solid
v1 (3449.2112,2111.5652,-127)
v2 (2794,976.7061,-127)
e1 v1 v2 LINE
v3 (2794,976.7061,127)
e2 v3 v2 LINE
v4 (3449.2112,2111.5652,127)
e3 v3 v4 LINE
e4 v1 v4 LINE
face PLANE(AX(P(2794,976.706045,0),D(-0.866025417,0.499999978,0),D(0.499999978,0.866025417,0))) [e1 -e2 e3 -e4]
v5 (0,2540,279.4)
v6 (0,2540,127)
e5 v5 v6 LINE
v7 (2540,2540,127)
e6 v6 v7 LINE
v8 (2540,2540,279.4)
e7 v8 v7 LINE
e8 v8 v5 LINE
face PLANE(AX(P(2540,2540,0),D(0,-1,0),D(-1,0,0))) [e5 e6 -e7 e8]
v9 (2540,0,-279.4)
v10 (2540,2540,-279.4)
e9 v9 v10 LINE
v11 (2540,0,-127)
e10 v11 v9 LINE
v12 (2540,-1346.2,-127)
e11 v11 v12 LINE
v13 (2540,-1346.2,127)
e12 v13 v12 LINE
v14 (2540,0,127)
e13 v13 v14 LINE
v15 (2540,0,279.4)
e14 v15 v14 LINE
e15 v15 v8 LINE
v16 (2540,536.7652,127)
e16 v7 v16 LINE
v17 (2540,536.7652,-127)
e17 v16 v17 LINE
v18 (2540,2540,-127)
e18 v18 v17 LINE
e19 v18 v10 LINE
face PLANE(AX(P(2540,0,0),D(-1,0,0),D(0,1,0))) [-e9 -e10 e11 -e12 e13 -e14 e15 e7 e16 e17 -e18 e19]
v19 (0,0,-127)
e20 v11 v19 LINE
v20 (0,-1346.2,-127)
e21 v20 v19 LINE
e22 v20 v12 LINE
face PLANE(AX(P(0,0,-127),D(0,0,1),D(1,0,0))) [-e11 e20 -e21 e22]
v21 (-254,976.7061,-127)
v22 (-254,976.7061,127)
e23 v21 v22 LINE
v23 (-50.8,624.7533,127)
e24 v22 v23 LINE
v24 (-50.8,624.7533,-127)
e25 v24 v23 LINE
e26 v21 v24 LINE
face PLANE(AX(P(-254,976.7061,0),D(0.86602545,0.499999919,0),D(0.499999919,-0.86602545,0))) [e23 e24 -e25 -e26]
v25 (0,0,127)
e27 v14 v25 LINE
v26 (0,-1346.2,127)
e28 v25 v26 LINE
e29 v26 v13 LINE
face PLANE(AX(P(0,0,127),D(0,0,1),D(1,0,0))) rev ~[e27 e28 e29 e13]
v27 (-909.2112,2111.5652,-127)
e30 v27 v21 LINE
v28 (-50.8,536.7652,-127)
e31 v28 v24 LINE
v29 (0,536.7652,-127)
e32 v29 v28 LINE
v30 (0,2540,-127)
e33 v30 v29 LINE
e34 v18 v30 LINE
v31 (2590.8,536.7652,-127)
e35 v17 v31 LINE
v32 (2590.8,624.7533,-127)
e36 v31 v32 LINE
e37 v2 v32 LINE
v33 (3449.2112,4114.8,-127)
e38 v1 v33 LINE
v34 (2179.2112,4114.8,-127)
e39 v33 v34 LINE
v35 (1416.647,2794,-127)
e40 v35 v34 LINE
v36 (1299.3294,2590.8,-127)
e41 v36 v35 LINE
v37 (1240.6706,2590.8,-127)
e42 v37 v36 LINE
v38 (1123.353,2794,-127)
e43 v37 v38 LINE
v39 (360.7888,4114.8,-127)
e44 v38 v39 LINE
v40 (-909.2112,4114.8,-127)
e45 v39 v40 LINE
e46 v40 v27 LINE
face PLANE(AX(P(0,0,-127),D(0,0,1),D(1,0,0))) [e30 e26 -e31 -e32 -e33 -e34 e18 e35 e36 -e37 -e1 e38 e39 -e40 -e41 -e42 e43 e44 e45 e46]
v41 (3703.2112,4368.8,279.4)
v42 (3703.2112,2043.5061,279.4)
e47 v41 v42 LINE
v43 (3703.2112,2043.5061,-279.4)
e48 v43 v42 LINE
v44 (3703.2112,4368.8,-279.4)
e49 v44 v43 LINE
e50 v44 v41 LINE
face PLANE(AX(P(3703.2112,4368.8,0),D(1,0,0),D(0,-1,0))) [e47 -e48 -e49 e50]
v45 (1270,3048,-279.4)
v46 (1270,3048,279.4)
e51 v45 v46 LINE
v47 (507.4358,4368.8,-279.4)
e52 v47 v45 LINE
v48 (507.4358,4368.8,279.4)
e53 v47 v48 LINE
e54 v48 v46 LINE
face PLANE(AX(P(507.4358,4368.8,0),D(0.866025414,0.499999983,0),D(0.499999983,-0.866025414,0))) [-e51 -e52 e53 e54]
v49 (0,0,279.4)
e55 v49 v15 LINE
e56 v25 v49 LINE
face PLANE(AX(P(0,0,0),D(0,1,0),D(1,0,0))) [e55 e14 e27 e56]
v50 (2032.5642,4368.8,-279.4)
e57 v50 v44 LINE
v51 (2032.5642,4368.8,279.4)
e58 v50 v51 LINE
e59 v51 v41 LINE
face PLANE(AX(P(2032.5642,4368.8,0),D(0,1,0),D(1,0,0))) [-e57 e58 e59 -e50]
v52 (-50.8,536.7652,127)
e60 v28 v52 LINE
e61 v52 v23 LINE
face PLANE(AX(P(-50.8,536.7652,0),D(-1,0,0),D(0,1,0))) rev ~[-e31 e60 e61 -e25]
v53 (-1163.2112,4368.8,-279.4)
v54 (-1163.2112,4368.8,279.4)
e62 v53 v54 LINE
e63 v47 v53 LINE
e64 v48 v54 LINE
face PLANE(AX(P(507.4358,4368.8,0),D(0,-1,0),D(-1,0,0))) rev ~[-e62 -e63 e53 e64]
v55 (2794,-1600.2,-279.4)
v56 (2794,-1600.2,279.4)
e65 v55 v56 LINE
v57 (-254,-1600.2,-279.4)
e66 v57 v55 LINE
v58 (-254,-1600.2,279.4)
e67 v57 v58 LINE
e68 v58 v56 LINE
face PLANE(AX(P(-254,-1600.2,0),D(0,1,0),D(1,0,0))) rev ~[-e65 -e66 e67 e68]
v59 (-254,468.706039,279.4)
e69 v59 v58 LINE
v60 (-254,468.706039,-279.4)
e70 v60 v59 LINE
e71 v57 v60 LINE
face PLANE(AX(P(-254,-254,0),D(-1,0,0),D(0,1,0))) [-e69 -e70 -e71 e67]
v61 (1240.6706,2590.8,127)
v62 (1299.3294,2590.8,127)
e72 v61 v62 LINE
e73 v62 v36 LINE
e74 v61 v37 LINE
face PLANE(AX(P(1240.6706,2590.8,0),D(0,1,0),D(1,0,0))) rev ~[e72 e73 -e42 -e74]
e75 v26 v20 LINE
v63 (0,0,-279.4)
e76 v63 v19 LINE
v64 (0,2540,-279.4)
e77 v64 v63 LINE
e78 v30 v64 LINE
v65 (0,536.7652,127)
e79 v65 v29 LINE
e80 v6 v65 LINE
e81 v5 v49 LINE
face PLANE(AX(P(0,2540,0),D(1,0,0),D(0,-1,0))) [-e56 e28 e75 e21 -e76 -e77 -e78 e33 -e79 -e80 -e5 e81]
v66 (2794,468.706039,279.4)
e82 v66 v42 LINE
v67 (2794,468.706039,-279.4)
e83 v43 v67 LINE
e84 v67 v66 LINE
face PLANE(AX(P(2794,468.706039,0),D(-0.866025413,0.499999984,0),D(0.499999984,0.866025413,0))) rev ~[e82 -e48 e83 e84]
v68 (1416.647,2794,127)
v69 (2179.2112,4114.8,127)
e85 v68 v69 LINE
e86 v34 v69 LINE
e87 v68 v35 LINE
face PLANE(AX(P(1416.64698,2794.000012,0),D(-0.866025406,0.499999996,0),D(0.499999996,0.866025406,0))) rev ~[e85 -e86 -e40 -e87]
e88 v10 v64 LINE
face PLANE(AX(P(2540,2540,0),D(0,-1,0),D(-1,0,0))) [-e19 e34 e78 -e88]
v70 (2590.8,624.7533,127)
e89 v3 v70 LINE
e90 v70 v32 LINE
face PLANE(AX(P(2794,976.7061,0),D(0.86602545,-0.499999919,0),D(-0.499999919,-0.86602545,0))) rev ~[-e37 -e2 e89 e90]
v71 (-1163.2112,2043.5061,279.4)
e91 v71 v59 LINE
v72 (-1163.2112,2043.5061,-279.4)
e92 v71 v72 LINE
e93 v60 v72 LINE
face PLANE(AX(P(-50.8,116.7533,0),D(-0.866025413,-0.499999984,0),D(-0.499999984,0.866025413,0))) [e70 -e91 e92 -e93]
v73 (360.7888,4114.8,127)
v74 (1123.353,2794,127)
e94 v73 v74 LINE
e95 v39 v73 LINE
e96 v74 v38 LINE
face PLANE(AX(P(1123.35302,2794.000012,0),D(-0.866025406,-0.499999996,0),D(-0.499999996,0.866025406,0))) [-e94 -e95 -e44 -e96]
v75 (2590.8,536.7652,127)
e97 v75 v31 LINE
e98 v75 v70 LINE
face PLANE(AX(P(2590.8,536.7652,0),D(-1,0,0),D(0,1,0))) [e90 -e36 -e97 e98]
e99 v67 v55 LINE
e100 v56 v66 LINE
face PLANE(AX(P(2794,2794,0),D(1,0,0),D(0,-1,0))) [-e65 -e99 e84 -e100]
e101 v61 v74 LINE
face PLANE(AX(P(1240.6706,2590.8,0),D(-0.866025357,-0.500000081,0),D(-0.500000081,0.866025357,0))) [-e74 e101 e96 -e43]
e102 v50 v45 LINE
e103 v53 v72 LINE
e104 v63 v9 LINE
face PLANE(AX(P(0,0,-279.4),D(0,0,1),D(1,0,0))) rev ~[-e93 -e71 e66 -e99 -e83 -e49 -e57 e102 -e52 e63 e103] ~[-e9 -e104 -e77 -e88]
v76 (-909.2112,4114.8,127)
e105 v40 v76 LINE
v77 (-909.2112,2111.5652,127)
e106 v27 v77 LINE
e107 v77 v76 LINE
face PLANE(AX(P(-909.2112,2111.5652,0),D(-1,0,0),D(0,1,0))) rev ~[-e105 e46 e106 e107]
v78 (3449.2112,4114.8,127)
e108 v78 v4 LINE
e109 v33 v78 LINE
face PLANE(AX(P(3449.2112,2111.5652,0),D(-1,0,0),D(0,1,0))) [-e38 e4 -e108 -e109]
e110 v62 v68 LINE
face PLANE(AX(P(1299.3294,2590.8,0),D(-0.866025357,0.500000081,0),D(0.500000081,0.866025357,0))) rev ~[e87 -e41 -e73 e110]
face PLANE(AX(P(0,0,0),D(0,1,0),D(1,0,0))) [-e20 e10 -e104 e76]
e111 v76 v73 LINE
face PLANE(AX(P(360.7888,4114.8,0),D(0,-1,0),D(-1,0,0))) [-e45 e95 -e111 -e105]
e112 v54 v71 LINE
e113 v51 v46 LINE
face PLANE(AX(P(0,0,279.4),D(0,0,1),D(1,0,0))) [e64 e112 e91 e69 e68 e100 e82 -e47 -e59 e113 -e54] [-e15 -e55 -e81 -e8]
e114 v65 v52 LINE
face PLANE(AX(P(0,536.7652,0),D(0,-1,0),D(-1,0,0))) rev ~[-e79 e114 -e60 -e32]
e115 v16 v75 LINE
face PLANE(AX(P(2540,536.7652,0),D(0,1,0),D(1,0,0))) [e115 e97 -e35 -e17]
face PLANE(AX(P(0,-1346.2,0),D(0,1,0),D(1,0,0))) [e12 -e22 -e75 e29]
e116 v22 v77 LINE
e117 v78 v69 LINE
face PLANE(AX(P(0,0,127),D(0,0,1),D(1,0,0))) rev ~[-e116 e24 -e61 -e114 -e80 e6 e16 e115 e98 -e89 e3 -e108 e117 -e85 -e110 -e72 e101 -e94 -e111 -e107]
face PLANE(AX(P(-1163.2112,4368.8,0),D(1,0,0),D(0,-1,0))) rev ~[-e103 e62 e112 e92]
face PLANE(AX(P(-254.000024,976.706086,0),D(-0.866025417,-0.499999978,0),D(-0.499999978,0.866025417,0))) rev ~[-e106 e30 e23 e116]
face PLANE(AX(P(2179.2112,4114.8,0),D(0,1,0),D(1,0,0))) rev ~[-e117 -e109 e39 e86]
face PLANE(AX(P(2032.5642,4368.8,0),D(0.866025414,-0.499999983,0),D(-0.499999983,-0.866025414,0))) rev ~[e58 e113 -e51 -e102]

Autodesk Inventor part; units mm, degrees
ref_plane "YZ Plane" through (0, 0, 0) normal (1, 0, 0) x (0, 1, 0)
ref_plane "XZ Plane" through (0, 0, 0) normal (0, 1, 0) x (-1, 0, 0)
sketch "Sketch1" plane through (0, 0, 0) normal (0, 0, 1) x (1, 0, 0)
  line L0 (0, 0) -> (2540, 0)
  line L1 (2540, 0) -> (2540, 2540)
  line L2 (2540, 2540) -> (0, 2540)
  line L3 (0, 2540) -> (0, 0)
  line L4 (-254, 2794) -> (2794, 2794)
  line L5 (2794, 2794) -> (2794, -254)
  line L6 (2794, -254) -> (-254, -254)
  line L7 (-254, -254) -> (-254, 2794)
  line L8 (1270, 0) -> (1270, 1270) construction
  dimension "d0" = 2540
  dimension "d1" = 2540
  dimension "d3" = 254
  dimension "d4" = 254
  dimension "d5" = 254
  dimension "d6" = 254
  dimension "d932" = 1270
extrude "frame" add sketch "Sketch1" along normal mid plane 558.8
ref_plane "middle of part" through (0, 0, 0) normal (0, 0, 1) x (1, 0, 0)
sketch "Sketch8" plane through (0, 0, 0) normal (0, 0, 1) x (1, 0, 0)
  line L0 (2540, 0) -> (0, 0) projected
  line L1 (0, 0) -> (0, -254)
  line L2 (-254, -254) -> (2794, -254) projected
  line L3 (0, -254) -> (2540, -254)
  line L4 (2540, 2540) -> (2540, 0) projected
  line L5 (2540, -254) -> (2540, 0)
  line L6 (2540, 0) -> (0, 0)
extrude "door slot bottom" cut sketch "Sketch8" along normal mid plane 254
sketch "Sketch7" plane through (0, 0, 0) normal (0, 0, 1) x (1, 0, 0)
  line L0 (102.3298, 595.8453) -> (-251.9439, 1209.4654) construction
  line L1 (-254, -254) -> (-254, 2794) projected
  line L2 (1123.353, 2794) -> (-254, 2794)
  line L3 (-254, 2794) -> (-254, 976.7061)
  line L4 (-254, 976.7061) -> (-50.8, 624.7533)
  line L5 (0, 2540) -> (0, 0) projected
  line L6 (0, 536.7652) -> (0, 2540)
  line L7 (0, 2540) -> (1270, 2540)
  line L8 (1270, 1270) -> (1270, 1044.9425)
  line L9 (1270, 1270) -> (0, 536.7652)
  line L10 (1270, 1620.4707) -> (1270, 1965.6323) construction
  line L11 (1240.6706, 2590.8) -> (1123.353, 2794)
  line L12 (0, 536.7652) -> (-50.8, 536.7652)
  line L13 (-50.8, 536.7652) -> (-50.8, 624.7533)
  line L14 (2437.6702, 595.8453) -> (2791.9439, 1209.4654) construction
  line L15 (2794, -254) -> (2794, 2794)
  line L16 (1416.647, 2794) -> (2794, 2794)
  line L17 (2794, 2794) -> (2794, 976.7061)
  line L18 (2794, 976.7061) -> (2590.8, 624.7533)
  line L19 (2540, 2540) -> (2540, 0)
  line L20 (2540, 536.7652) -> (2540, 2540)
  line L21 (2540, 2540) -> (1270, 2540)
  line L22 (1270, 1270) -> (2540, 536.7652)
  line L23 (1299.3294, 2590.8) -> (1416.647, 2794)
  line L24 (2540, 536.7652) -> (2590.8, 536.7652)
  line L25 (2590.8, 536.7652) -> (2590.8, 624.7533)
  line L26 (1240.6706, 2590.8) -> (1299.3294, 2590.8)
  dimension "d878" = 60
  dimension "d889" = 50.8
  dimension "d901" = 50.8
extrude "top left and right slots" cut sketch "Sketch7" along normal mid plane 254 contours L1 L2 L11 L26 L23 L16 L15 L18 L25 L24 L19 L21 L7 L5 L12 L13 L4
sketch "Sketch13" plane through (0, 0, 0) normal (0, 0, 1) x (1, 0, 0)
  line L0 (0, -254) -> (0, 0) projected
  line L1 (0, -50.8) -> (0, -1346.2)
  line L2 (0, -1346.2) -> (2540, -1346.2)
  line L3 (2540, 0) -> (2540, -254) projected
  line L4 (2540, -1346.2) -> (2540, -50.8)
  line L5 (2794, -254) -> (-254, -254) projected
  line L6 (2540, -50.8) -> (0, -50.8) projected
  line L7 (2540, -50.8) -> (0, -50.8)
  line L8 (-50.8, 624.7533) -> (-254, 976.7061) projected
  line L9 (1240.6706, 2590.8) -> (1299.3294, 2590.8) projected
  line L10 (507.4358, 4368.8) -> (-1163.2112, 4368.8)
  line L11 (-1163.2112, 4368.8) -> (-1163.2112, 2043.5061)
  line L12 (1270, 3756.6434) -> (1270, 722.7588) construction
  line L13 (2540, 2590.8) -> (1299.3294, 2590.8)
  line L14 (1123.353, 2794) -> (1240.6706, 2590.8) projected
  line L15 (-50.8, 116.7533) -> (-1163.2112, 2043.5061)
  line L16 (-50.8, 624.7533) -> (-909.2112, 2111.5652)
  line L17 (-909.2112, 2111.5652) -> (-909.2112, 4114.8)
  line L18 (-50.8, 536.7652) -> (-50.8, 2540) projected
  line L19 (360.7888, 4114.8) -> (-909.2112, 4114.8)
  line L20 (1240.6706, 2590.8) -> (360.7888, 4114.8)
  line L21 (507.4358, 4368.8) -> (1270, 3048)
  line L22 (0, -50.8) -> (-254, -50.8)
  line L23 (-254, -254) -> (-254, 2794) projected
  line L24 (-254, -50.8) -> (-254, -1600.2)
  line L25 (-254, -1600.2) -> (2794, -1600.2)
  line L26 (2794, -1600.2) -> (2794, -50.8)
  line L27 (2794, 2794) -> (2794, -254) projected
  line L28 (2540, -50.8) -> (2794, -50.8)
  line L29 (1240.6706, 2590.8) -> (1270, 2590.8)
  line L30 (0, 2590.8) -> (2540, 2590.8) projected
  line L31 (1270, 2590.8) -> (1270, 3048)
  line L32 (-50.8, 536.7652) -> (-50.8, 624.7533) projected
  line L33 (-50.8, 624.7533) -> (-50.8, 116.7533)
  line L34 (2032.5642, 4368.8) -> (3703.2112, 4368.8)
  line L35 (3703.2112, 4368.8) -> (3703.2112, 2043.5061)
  line L36 (1416.647, 2794) -> (1299.3294, 2590.8)
  line L37 (2590.8, 116.7533) -> (3703.2112, 2043.5061)
  line L38 (2590.8, 624.7533) -> (3449.2112, 2111.5652)
  line L39 (3449.2112, 2111.5652) -> (3449.2112, 4114.8)
  line L40 (2179.2112, 4114.8) -> (3449.2112, 4114.8)
  line L41 (1299.3294, 2590.8) -> (2179.2112, 4114.8)
  line L42 (2032.5642, 4368.8) -> (1270, 3048)
  line L43 (1299.3294, 2590.8) -> (1270, 2590.8)
  line L44 (2590.8, 624.7533) -> (2590.8, 116.7533)
  line L45 (2794, 2794) -> (-254, 2794) projected
  dimension "d878" = 60
  dimension "d889" = 50.8
  dimension "d901" = 50.8
  dimension "d903" = 1295.4
  dimension "d907" = 254
  dimension "d916" = 254
  dimension "d917" = 254
  dimension "d919" = 254
  dimension "d920" = 254
  dimension "d921" = 254
  dimension "d926" = 655.2112
  dimension "d927" = 1320.8
extrude "door recieves" add sketch "Sketch13" along normal mid plane 558.8 contours L1 L2 L4 L5 L26 L25 L24 | L3 L28 L26 L5 | L23 L8 L18 L33 L15 | L15 L11 L10 L21 L31 L45 L20 L19 L17 L16 L23 | L37 L44 L38 L27 | L27 L38 L39 L40 L41 L45 L31 L42 L34 L35 L37 | L45 L31 L9 L14 | L36 L9 L31 L45
sketch "Sketch14" plane through (0, 0, 279.4) normal (0, 0, 1) x (1, 0, 0)
  line L0 (-254, 976.7061) -> (-909.2112, 2111.5652) projected
  line L1 (-909.2112, 2111.5652) -> (-909.2112, 4114.8) projected
  line L2 (-254, 976.7061) -> (-909.2112, 2111.5652)
  line L3 (-909.2112, 2111.5652) -> (-909.2112, 4114.8)
  line L4 (-909.2112, 4114.8) -> (360.7888, 4114.8)
  line L5 (-254, 2794) -> (1123.353, 2794) projected
  line L6 (360.7888, 4114.8) -> (1123.353, 2794)
  line L7 (1123.353, 2794) -> (-254, 2794)
  line L8 (-254, 2794) -> (-254, 976.7061)
  line L9 (3449.2112, 4114.8) -> (2179.2112, 4114.8) projected
  line L10 (1416.647, 2794) -> (2179.2112, 4114.8)
  line L11 (2179.2112, 4114.8) -> (3449.2112, 4114.8)
  line L12 (2794, 976.7061) -> (3449.2112, 2111.5652) projected
  line L13 (3449.2112, 4114.8) -> (3449.2112, 2111.5652)
  line L14 (2794, 2794) -> (2794, 976.7061) projected
  line L15 (3449.2112, 2111.5652) -> (2794, 976.7061)
  line L16 (2794, 976.7061) -> (2794, 2794)
  line L17 (2794, 2794) -> (1416.647, 2794)
  line L18 (2540, -254) -> (0, -254) projected
  line L19 (0, -1346.2) -> (0, -254) projected
  line L20 (0, -254) -> (0, -1346.2)
  line L21 (2540, -1346.2) -> (2540, -254) projected
  line L22 (0, -1346.2) -> (2540, -1346.2)
  line L23 (2540, -1346.2) -> (2540, -254)
  line L24 (2540, -254) -> (0, -254)
  point P0 (0, 0)
extrude "front hide door" add sketch "Sketch14" against normal up to surface (152.4 mm away)
sketch "Sketch15" plane through (0, 0, -279.4) normal (0, 0, -1) x (-1, 0, 0)
  line L0 (-1416.647, 2794) -> (-2794, 2794) projected
  line L1 (-3449.2112, 4114.8) -> (-2179.2112, 4114.8) projected
  line L2 (-1416.647, 2794) -> (-2179.2112, 4114.8)
  line L3 (-2179.2112, 4114.8) -> (-3449.2112, 4114.8)
  line L4 (-3449.2112, 2111.5652) -> (-3449.2112, 4114.8) projected
  line L5 (-3449.2112, 4114.8) -> (-3449.2112, 2111.5652)
  line L6 (-3449.2112, 2111.5652) -> (-2794, 976.7061)
  line L7 (-2794, 976.7061) -> (-2794, 2794)
  line L8 (-2794, 2794) -> (-1416.647, 2794)
  line L9 (254, 2794) -> (-1123.353, 2794) projected
  line L10 (-360.7888, 4114.8) -> (909.2112, 4114.8) projected
  line L11 (-1123.353, 2794) -> (-360.7888, 4114.8)
  line L12 (-360.7888, 4114.8) -> (909.2112, 4114.8)
  line L13 (909.2112, 2111.5652) -> (254, 976.7061) projected
  line L14 (909.2112, 4114.8) -> (909.2112, 2111.5652)
  line L15 (909.2112, 2111.5652) -> (254, 976.7061)
  line L16 (254, 976.7061) -> (254, 2794) projected
  line L17 (254, 976.7061) -> (254, 2794)
  line L18 (254, 2794) -> (-1123.353, 2794)
  line L19 (0, -254) -> (0, -1346.2) projected
  line L20 (0, -254) -> (0, -1346.2)
  line L21 (0, -1346.2) -> (-2540, -1346.2) projected
  line L22 (0, -1346.2) -> (-2540, -1346.2)
  line L23 (-2540, -254) -> (0, -254) projected
  line L24 (-2540, -1346.2) -> (-2540, -254)
  line L25 (-2540, -254) -> (0, -254)
  point P0 (0, 0)
extrude "gap for door pieces" add sketch "Sketch15" against normal up to surface (152.4 mm away)
equation "\"d3\" = d4"
equation "\"d5\" = d4"
equation "\"d6\" = d4"
properties part number "end door"
